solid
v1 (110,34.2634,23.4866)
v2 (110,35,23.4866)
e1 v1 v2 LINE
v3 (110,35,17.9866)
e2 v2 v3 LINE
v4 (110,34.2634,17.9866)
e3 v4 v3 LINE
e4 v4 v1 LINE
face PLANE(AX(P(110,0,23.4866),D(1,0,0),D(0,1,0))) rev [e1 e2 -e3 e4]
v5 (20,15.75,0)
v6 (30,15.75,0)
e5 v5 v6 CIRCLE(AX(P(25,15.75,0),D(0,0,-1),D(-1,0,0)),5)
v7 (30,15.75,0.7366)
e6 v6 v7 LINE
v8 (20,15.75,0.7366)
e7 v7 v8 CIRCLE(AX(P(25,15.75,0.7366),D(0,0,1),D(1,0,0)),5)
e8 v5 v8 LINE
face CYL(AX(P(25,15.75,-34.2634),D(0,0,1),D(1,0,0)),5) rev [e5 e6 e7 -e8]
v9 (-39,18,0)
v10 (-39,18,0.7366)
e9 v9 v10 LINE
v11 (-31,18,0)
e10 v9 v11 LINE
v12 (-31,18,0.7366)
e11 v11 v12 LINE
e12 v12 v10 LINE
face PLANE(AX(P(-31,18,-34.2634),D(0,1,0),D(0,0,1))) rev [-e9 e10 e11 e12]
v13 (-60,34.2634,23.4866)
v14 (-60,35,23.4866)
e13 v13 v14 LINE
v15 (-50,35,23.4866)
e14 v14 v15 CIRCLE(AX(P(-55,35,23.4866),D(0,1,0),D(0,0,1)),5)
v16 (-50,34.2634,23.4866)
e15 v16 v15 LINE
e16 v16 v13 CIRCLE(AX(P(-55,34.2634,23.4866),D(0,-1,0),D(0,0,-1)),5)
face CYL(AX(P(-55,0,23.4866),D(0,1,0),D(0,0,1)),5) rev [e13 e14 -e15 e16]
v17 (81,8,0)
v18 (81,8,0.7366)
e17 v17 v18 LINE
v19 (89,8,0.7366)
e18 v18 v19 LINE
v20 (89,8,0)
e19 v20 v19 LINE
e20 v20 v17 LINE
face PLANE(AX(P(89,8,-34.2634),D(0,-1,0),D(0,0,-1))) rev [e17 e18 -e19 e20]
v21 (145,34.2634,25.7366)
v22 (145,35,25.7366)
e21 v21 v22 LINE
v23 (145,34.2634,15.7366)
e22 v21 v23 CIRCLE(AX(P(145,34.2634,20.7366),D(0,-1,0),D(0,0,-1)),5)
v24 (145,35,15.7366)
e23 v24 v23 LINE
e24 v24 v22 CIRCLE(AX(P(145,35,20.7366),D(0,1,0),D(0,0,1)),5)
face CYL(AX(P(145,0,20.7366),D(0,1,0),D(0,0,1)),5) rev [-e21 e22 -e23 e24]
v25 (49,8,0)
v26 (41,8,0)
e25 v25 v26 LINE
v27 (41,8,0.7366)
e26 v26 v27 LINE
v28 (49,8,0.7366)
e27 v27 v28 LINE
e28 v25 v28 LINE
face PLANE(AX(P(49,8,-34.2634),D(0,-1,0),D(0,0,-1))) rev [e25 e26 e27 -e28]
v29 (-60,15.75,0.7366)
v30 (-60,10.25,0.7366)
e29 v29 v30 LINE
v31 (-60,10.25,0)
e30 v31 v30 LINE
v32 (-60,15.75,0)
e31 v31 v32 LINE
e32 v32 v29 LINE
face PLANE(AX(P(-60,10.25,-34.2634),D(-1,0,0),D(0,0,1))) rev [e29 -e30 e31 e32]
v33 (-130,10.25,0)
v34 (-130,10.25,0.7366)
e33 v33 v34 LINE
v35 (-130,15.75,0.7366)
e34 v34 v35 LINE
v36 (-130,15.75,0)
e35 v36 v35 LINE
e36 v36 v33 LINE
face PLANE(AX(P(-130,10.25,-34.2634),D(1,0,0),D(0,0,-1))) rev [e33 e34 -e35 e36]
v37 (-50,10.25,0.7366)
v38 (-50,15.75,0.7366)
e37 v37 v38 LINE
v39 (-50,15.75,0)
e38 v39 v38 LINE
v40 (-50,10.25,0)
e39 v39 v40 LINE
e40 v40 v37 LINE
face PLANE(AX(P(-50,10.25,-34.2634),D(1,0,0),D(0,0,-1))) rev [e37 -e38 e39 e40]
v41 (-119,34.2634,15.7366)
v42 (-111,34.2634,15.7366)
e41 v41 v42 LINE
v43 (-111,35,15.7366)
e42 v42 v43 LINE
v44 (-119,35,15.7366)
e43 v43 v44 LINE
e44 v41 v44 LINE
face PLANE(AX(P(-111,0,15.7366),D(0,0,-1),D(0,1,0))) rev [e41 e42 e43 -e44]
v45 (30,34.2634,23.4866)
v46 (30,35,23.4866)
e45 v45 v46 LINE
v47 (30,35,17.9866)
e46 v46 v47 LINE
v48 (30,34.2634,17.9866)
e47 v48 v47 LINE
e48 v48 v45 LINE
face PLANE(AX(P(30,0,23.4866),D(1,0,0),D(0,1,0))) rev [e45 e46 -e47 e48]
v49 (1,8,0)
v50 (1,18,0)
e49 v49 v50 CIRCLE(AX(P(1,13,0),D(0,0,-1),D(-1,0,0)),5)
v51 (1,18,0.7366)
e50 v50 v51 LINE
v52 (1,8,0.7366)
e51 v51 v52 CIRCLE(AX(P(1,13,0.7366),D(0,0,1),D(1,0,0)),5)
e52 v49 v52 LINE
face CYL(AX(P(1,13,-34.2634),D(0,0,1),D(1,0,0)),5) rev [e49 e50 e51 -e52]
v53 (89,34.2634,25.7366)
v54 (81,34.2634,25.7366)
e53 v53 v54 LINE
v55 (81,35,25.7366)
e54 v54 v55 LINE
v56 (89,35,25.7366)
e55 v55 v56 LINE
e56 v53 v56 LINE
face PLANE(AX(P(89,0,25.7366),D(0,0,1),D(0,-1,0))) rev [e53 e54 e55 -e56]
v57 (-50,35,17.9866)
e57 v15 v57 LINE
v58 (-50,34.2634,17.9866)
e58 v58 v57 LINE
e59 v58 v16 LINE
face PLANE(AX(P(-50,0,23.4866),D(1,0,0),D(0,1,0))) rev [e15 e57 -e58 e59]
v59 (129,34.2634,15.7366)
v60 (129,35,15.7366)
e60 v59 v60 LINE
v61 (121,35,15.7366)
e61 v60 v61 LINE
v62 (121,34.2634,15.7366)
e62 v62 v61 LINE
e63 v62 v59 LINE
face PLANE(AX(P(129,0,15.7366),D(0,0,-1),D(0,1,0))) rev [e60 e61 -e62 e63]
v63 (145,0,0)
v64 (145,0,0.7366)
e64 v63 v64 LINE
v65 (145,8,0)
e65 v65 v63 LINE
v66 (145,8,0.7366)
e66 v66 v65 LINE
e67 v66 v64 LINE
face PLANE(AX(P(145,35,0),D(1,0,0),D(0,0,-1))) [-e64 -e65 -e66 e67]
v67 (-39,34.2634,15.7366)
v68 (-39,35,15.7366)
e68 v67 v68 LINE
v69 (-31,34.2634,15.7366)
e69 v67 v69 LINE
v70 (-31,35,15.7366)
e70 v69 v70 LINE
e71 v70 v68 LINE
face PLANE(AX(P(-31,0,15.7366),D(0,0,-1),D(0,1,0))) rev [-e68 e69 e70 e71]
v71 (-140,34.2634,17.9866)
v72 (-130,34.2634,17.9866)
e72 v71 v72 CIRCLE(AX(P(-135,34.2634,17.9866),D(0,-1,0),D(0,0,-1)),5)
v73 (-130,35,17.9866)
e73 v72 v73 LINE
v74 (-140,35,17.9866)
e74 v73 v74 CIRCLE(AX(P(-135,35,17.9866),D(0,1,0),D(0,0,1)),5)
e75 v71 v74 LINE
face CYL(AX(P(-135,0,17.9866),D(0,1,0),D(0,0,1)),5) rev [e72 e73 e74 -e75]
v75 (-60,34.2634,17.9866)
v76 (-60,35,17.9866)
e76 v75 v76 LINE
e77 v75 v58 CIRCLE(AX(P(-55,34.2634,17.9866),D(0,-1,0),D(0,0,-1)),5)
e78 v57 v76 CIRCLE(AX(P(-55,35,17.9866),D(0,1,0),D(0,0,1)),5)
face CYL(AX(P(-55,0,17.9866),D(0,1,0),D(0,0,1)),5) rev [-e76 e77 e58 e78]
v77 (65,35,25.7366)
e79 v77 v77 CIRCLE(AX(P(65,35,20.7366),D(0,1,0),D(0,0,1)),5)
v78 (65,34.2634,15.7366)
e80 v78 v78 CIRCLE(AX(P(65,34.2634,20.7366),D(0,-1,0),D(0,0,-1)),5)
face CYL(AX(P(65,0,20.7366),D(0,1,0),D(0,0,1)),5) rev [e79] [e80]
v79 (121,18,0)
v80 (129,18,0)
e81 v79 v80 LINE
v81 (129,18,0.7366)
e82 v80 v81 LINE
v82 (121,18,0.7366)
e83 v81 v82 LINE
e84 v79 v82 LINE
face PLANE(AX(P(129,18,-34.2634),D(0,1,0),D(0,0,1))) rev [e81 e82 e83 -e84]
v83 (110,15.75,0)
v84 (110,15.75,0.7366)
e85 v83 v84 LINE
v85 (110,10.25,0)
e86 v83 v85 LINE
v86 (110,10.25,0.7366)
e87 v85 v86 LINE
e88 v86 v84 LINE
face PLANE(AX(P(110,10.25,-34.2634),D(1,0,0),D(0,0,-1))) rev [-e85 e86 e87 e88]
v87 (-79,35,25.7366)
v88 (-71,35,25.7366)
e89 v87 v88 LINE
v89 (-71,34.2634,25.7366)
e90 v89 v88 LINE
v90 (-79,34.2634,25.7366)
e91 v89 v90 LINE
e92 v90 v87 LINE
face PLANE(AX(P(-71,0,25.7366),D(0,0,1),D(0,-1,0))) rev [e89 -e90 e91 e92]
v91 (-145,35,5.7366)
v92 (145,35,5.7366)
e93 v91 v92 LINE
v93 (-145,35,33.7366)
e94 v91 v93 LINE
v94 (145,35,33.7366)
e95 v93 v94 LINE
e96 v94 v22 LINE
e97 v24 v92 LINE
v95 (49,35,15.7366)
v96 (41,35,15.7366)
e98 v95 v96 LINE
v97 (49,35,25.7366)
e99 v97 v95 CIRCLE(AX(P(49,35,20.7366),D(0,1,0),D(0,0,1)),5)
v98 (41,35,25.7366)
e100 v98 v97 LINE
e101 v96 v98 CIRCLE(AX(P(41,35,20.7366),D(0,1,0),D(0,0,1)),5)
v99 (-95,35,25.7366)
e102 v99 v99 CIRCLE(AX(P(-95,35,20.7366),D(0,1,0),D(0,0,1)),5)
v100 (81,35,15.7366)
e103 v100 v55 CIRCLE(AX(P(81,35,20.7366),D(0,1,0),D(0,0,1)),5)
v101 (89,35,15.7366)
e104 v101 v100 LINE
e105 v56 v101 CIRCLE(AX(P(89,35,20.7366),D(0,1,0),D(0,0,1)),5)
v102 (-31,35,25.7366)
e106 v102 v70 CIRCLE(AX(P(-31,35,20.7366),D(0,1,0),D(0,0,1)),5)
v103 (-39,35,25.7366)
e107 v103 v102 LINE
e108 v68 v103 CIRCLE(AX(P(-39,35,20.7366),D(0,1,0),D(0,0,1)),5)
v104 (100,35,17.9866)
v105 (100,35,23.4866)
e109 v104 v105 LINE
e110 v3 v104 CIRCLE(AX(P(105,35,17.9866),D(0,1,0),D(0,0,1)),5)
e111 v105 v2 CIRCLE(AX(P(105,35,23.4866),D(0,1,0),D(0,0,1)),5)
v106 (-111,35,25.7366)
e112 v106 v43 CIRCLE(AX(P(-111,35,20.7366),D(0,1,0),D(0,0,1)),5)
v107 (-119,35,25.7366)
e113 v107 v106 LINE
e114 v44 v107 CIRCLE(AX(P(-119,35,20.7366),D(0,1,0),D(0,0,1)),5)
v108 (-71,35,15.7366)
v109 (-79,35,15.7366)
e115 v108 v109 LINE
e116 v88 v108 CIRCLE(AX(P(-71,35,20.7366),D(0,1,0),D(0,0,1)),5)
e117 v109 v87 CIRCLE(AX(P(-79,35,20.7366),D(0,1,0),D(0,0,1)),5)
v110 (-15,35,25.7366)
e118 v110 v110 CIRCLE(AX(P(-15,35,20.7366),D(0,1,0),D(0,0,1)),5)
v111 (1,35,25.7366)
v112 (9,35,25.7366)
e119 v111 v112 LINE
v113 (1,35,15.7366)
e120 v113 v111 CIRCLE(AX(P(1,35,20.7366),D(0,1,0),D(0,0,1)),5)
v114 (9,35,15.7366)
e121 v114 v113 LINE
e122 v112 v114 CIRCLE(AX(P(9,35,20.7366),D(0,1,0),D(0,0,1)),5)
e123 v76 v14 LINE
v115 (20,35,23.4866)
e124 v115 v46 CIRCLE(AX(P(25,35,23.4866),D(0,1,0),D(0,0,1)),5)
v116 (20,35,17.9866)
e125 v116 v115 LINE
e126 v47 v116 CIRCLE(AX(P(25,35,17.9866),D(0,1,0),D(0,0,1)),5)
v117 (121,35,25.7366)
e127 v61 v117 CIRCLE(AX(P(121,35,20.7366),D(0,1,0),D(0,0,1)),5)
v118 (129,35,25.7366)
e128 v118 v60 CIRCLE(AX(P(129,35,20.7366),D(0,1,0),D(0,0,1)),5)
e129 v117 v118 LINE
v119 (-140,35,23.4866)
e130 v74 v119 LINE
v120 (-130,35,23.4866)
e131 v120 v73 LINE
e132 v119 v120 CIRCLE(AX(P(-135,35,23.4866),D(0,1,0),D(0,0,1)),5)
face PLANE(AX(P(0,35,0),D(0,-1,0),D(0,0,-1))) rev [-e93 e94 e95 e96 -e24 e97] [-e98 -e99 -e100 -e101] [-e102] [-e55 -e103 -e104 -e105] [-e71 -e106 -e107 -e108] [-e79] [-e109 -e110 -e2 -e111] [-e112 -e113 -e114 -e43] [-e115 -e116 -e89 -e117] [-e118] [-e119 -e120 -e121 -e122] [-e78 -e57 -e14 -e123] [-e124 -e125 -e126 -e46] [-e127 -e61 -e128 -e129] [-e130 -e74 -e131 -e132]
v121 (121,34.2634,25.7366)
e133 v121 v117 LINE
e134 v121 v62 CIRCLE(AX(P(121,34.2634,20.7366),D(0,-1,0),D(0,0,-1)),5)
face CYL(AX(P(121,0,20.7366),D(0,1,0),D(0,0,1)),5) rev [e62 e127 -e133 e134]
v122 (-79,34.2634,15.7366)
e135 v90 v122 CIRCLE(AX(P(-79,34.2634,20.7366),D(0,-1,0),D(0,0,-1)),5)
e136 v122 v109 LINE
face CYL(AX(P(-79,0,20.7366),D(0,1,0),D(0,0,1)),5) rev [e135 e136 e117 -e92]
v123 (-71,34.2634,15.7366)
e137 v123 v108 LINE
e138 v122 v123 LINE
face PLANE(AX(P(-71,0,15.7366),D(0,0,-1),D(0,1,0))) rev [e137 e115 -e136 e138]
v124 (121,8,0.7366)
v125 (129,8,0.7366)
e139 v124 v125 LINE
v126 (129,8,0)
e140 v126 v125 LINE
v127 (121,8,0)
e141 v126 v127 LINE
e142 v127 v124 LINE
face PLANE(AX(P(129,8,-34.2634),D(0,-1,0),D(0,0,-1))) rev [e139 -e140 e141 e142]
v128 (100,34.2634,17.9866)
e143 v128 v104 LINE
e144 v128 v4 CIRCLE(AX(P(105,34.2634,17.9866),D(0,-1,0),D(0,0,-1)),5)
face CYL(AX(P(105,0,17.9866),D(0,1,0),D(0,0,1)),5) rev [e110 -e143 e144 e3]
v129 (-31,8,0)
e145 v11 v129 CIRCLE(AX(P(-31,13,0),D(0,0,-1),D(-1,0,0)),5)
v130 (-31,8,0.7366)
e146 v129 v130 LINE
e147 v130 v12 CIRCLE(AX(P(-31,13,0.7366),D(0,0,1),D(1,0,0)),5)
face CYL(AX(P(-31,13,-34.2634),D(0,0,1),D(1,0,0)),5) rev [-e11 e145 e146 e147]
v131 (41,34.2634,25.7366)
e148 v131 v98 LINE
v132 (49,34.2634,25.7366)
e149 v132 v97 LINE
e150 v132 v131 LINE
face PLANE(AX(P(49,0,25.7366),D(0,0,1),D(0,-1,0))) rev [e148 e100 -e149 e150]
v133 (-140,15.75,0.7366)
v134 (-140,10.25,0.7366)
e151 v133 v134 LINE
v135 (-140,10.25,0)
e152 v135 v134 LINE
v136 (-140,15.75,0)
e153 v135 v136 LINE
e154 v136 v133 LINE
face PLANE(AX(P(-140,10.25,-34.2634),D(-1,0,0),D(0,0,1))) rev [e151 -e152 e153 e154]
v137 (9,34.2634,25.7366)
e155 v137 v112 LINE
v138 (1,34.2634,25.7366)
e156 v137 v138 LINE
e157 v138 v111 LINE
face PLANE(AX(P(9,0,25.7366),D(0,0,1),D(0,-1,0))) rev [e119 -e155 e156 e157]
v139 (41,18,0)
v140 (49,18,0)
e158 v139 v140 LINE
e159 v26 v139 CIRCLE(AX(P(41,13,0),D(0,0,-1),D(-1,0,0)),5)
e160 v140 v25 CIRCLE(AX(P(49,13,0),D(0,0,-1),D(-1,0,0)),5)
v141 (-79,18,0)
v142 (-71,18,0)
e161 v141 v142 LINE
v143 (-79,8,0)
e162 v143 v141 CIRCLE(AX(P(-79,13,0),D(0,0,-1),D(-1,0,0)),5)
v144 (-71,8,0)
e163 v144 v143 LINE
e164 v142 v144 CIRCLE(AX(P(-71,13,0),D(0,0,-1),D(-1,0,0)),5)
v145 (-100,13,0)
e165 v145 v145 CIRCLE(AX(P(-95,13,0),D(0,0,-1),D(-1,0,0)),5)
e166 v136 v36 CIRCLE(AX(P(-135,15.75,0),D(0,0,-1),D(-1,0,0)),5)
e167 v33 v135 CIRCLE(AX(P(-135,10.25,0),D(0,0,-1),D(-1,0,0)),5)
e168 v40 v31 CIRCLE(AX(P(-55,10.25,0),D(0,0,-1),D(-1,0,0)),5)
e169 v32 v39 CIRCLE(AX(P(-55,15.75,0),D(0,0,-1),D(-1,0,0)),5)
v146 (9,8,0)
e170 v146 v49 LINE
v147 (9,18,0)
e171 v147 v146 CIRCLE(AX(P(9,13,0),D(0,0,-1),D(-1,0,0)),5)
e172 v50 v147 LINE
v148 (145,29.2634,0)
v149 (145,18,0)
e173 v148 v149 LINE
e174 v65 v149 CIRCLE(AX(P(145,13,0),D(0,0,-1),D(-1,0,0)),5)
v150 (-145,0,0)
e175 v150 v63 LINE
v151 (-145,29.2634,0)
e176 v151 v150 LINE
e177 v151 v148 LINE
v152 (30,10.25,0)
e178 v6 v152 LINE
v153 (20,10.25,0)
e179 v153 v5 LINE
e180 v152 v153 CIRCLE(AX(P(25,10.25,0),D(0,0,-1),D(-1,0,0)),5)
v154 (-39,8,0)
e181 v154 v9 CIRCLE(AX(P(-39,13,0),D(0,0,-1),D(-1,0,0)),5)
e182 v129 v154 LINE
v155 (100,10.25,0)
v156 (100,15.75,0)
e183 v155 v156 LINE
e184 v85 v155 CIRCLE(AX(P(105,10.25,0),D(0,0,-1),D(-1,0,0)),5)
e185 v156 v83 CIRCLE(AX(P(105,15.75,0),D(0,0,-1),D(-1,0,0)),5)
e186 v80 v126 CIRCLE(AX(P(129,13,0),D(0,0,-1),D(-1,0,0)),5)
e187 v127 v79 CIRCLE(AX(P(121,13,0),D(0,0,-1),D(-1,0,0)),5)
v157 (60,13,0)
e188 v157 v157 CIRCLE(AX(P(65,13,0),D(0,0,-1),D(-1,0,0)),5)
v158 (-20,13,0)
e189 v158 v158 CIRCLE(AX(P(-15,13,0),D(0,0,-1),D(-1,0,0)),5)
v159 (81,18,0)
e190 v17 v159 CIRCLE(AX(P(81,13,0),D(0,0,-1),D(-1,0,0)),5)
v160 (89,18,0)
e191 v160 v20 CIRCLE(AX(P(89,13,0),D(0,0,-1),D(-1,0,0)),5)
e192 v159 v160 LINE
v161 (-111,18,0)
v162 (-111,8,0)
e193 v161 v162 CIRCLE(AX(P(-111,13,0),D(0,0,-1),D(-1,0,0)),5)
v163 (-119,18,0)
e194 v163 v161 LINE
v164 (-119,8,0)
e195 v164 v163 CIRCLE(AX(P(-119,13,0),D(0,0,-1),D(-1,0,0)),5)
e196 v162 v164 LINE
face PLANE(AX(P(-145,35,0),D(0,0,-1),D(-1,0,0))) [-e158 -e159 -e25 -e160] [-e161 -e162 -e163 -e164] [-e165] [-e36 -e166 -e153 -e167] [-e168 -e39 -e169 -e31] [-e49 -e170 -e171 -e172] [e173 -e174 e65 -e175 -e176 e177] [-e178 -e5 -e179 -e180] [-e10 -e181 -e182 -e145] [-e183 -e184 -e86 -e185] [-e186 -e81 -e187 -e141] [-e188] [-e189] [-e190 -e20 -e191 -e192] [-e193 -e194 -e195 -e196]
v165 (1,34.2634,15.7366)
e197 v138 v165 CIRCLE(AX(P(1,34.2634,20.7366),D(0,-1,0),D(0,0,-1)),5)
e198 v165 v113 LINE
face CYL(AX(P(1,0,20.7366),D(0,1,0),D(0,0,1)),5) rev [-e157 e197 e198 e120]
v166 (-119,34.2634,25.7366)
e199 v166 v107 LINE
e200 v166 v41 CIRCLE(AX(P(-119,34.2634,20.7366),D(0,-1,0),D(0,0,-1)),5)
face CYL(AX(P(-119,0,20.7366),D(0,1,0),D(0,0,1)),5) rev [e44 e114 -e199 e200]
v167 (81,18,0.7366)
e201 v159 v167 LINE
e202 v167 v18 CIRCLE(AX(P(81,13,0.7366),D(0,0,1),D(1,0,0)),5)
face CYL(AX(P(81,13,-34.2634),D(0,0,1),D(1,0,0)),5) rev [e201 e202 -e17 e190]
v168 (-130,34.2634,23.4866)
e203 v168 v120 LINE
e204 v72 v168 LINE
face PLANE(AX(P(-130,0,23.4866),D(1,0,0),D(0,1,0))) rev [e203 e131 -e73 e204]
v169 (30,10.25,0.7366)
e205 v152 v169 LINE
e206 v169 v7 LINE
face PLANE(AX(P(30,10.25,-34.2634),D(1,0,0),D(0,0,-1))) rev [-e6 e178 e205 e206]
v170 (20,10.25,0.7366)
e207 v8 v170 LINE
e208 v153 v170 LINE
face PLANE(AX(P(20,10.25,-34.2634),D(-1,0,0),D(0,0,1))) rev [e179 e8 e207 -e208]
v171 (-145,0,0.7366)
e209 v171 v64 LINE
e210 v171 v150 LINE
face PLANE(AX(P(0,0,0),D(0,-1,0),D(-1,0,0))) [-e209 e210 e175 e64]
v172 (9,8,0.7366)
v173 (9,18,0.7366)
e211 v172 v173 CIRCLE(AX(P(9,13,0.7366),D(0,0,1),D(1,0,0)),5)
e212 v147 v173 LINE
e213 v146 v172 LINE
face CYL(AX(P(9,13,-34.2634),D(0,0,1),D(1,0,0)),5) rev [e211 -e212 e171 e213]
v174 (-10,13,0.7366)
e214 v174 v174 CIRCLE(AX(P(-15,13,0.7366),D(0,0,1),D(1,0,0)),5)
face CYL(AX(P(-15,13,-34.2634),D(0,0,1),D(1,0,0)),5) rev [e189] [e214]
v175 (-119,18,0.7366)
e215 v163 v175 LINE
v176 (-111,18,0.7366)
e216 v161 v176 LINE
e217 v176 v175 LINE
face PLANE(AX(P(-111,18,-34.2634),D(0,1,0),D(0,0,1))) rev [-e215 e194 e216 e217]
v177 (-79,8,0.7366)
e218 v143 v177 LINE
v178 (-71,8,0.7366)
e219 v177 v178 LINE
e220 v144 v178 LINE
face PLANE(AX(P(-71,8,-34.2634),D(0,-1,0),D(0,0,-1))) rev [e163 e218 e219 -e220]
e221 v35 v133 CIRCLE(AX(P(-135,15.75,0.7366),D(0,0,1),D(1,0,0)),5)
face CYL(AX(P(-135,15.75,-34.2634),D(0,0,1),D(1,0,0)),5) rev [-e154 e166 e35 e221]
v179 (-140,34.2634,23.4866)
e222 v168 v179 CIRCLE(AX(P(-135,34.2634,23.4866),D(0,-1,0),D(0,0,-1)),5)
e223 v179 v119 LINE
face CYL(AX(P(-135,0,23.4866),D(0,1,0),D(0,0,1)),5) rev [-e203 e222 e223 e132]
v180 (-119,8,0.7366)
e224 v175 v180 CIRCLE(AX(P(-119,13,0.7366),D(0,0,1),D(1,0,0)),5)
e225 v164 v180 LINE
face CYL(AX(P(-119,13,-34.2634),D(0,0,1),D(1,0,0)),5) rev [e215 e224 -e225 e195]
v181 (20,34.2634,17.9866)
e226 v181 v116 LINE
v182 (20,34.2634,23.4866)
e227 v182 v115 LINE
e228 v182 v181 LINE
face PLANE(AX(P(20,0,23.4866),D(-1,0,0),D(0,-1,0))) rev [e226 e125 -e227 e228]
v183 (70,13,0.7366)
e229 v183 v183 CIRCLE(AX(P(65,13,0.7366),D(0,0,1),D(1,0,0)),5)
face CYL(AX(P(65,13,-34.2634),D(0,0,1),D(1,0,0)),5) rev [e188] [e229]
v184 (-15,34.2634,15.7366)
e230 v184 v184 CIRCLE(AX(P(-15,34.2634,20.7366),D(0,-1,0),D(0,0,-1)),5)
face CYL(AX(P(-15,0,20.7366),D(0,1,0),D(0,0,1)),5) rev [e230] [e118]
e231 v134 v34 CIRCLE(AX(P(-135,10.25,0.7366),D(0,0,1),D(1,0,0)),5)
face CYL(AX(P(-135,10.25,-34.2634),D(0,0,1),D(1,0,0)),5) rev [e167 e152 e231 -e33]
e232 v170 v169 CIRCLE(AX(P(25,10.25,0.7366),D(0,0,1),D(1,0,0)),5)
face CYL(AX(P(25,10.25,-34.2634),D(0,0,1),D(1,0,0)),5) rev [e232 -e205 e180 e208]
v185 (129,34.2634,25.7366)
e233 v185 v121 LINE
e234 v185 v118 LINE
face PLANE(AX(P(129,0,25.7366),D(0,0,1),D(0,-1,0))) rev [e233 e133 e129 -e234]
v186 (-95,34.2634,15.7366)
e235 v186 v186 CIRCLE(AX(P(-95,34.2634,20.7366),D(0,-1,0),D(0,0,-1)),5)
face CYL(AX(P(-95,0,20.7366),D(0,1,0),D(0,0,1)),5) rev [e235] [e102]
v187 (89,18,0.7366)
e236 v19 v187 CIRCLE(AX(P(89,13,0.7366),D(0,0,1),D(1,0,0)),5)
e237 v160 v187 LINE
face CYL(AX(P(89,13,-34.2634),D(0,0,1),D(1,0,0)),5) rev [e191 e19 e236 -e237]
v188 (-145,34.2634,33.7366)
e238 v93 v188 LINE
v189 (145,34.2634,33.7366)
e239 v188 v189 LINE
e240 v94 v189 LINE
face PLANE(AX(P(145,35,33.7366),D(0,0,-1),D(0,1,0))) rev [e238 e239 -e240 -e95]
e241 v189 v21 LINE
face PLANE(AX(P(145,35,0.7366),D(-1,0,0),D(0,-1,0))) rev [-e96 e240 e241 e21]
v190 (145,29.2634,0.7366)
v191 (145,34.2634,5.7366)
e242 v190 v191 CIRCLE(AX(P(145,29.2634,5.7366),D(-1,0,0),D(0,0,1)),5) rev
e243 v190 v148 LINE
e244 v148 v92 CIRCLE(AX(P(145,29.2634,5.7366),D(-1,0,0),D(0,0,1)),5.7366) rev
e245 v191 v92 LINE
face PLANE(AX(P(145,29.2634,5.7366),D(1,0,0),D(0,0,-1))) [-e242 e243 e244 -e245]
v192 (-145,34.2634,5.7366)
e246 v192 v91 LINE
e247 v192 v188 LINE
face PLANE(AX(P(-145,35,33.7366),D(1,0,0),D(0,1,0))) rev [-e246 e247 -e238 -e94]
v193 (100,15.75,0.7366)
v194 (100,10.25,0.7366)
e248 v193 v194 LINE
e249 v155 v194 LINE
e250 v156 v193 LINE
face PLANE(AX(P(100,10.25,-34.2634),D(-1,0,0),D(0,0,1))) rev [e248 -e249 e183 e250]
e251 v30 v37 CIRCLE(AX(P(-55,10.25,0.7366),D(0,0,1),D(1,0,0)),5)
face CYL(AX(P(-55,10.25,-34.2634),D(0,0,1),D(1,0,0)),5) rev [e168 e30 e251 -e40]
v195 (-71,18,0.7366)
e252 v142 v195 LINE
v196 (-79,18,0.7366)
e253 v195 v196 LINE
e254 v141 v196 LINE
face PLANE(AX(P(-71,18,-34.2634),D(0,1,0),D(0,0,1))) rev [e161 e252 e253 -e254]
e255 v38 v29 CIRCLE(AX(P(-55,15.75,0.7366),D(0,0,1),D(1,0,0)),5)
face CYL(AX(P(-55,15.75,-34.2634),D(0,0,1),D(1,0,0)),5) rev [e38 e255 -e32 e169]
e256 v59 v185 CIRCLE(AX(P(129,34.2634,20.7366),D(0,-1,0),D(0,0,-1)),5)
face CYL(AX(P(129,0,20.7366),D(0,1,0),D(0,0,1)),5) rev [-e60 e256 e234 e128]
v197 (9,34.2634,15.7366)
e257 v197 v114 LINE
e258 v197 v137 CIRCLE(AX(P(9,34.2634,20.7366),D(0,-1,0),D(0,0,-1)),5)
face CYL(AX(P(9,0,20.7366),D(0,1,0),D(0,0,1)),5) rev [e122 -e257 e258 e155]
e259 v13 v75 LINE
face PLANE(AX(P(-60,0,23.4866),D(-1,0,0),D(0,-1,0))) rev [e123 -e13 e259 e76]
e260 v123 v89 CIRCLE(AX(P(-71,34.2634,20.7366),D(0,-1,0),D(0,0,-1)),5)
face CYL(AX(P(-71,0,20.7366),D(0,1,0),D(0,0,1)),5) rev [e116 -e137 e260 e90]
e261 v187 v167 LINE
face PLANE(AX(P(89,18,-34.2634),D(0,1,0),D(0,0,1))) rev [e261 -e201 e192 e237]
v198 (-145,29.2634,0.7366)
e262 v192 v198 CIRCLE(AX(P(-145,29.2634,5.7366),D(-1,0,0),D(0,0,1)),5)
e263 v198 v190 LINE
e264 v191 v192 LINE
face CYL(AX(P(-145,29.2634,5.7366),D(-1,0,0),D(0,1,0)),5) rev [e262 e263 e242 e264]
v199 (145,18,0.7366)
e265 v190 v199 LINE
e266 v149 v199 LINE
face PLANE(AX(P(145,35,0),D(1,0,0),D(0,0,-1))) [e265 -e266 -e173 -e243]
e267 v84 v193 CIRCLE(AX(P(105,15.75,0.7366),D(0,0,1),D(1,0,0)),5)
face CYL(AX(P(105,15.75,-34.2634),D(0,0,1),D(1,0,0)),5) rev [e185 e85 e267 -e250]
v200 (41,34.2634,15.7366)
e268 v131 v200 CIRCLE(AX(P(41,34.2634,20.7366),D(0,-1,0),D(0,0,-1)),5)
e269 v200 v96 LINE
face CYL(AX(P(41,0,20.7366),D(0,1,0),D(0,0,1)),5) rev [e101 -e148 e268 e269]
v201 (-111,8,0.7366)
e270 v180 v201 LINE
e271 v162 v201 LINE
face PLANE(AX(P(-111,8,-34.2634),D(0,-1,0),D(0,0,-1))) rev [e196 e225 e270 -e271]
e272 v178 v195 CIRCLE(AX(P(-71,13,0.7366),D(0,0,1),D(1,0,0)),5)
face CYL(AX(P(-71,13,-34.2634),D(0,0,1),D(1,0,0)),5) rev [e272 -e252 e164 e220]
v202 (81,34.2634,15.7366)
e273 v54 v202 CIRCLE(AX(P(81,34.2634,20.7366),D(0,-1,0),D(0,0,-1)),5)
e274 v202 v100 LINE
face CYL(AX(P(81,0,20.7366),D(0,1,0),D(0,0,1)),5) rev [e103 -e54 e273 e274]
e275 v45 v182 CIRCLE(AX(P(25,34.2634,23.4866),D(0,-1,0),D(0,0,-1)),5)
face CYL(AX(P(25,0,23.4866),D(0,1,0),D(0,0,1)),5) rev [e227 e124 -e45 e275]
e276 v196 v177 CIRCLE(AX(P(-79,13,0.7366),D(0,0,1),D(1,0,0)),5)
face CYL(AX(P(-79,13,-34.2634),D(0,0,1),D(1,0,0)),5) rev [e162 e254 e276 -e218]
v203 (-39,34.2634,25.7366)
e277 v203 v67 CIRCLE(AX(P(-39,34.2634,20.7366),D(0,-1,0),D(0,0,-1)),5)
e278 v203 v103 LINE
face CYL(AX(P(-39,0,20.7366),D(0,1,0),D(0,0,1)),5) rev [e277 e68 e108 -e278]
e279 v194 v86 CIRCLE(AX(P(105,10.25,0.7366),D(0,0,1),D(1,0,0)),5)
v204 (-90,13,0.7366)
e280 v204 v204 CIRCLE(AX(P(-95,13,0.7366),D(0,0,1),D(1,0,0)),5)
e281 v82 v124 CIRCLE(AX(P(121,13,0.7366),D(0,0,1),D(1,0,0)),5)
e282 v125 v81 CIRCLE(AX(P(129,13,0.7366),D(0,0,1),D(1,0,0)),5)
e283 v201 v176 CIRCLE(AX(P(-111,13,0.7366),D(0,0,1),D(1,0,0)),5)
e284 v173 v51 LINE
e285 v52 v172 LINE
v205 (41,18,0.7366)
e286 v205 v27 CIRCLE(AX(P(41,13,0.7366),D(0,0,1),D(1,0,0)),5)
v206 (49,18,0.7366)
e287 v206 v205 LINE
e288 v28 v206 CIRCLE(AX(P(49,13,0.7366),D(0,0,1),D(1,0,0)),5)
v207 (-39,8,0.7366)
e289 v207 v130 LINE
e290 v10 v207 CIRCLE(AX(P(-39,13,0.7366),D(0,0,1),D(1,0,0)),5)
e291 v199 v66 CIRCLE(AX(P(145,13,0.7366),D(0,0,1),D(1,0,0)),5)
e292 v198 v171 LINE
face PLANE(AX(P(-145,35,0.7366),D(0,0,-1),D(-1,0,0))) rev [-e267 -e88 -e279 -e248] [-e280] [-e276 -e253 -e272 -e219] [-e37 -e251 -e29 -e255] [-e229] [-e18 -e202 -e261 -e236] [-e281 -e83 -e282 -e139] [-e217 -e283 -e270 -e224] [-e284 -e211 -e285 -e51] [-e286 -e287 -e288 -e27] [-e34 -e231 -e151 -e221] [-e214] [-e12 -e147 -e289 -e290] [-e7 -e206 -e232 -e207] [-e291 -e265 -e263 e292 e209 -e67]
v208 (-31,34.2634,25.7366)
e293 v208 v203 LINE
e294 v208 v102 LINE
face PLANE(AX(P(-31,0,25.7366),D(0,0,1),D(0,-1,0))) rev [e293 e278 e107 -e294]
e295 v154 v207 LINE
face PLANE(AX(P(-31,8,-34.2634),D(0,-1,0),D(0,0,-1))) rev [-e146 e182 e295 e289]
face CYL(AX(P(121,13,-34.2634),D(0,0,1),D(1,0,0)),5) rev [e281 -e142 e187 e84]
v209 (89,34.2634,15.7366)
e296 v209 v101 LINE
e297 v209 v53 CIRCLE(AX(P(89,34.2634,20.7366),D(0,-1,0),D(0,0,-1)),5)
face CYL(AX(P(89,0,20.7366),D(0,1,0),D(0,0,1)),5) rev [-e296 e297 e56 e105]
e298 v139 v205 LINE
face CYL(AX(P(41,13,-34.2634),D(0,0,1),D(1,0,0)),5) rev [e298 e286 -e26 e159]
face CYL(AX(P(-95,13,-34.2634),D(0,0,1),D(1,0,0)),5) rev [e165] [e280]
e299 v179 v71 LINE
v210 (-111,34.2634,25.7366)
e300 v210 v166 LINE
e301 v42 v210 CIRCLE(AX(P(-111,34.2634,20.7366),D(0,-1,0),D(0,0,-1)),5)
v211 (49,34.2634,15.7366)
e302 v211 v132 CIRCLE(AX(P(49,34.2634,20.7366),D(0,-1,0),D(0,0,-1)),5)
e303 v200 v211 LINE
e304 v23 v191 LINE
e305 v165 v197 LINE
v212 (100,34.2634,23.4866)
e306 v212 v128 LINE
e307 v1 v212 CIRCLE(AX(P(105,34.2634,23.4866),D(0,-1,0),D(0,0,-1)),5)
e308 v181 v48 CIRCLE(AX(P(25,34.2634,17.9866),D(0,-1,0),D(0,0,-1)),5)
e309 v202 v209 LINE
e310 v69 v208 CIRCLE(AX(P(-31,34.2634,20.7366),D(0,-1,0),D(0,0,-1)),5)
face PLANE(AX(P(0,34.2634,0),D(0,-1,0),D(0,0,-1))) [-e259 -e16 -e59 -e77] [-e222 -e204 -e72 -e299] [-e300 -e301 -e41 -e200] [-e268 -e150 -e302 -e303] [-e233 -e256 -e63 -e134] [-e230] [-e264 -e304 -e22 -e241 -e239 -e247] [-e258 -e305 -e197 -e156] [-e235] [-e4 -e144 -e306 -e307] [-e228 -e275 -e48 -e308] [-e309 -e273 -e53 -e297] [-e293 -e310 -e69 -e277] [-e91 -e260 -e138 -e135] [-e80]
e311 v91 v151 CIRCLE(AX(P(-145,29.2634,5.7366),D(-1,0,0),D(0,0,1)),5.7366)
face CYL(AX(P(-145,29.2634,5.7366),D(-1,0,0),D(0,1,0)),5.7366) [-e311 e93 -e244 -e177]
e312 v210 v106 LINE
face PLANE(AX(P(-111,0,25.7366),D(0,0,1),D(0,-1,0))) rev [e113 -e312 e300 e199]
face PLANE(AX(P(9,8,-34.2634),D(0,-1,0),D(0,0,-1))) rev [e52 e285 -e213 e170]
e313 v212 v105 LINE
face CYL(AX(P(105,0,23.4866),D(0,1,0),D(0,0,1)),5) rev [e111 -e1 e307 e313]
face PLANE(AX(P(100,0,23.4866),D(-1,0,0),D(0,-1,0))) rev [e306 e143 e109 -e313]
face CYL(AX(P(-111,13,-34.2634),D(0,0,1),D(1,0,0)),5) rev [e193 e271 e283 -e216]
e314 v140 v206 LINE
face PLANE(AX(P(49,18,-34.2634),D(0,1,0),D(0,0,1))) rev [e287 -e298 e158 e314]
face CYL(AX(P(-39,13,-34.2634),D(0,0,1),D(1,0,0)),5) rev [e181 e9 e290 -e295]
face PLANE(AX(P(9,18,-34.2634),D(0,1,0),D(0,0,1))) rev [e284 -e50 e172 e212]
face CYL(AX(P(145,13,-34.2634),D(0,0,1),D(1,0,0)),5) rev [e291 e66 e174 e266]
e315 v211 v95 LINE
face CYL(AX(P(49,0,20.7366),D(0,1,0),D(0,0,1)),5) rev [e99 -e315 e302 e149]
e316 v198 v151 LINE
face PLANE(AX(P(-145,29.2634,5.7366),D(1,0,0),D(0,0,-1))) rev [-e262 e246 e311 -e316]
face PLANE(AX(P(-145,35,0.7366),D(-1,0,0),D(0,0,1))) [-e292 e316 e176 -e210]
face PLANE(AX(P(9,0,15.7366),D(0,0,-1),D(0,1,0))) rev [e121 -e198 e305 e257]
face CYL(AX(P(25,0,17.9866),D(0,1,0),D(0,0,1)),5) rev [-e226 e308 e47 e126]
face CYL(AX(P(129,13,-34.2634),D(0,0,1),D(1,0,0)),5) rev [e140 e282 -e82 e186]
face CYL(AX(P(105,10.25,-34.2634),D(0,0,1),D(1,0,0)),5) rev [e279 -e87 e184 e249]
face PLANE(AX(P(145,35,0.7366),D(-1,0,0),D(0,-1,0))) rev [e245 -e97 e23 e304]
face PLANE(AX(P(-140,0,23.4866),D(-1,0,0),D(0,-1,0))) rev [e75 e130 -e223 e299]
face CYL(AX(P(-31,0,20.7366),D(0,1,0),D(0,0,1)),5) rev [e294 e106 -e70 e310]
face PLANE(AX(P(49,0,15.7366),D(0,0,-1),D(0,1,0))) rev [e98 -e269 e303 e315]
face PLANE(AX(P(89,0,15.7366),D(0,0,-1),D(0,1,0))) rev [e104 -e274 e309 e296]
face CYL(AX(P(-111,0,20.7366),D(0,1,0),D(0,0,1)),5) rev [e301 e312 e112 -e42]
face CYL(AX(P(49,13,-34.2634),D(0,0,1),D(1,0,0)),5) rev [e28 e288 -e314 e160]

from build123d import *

# Parameters (mm, degrees)
SKETCH1_W                    = 290
SKETCH1_H                    = 0.7366
BASE_FLANGE1_DEPTH           = 35
EDGE_FLANGE1_STRIP_W         = 12.9464
EDGE_FLANGE1_STRIP_H         = 0.7366
EDGE_FLANGE1_STRIP_CUT_DEPTH = 290
EDGE_FLANGE1_DEPTH           = 290
SKETCH11_R                   = 5
CUT_EXTRUDE1_DEPTH           = 153.931874309
LPATTERN1_COUNT              = 14
LPATTERN1_PITCH              = 80
SKETCH12_R                   = 5
CUT_EXTRUDE2_DEPTH           = 35
LPATTERN2_COUNT              = 15
LPATTERN2_PITCH              = 80


# Sheet-metal steps are written as plain solids
with BuildPart() as part:
    # Sketch1 → Base-Flange1 (new body)
    with BuildSketch(Plane(origin=(0, 0, 0), x_dir=(1, 0, 0), z_dir=(0, 1, 0))):
        with Locations((0, -0.3683)):
            Rectangle(SKETCH1_W, SKETCH1_H)
    extrude(amount=BASE_FLANGE1_DEPTH)

    # Edge-Flange1 strip (across the edge) → Edge-Flange1 strip cut (cut)
    with BuildSketch(Plane(origin=(145, 35, 0.7366), x_dir=(0, -1, 0), z_dir=(-1, 0, 0))):
        with Locations((-0.7366, -0.3683)):
            Rectangle(EDGE_FLANGE1_STRIP_W, EDGE_FLANGE1_STRIP_H)
    extrude(amount=EDGE_FLANGE1_STRIP_CUT_DEPTH, mode=Mode.SUBTRACT)

    # Edge-Flange1 section (across the edge) → Edge-Flange1 (add)
    with BuildSketch(Plane(origin=(145, 35, 0.7366), x_dir=(0, -1, 0), z_dir=(-1, 0, 0))):
        with BuildLine():
            Line((0, 5), (0, 33))
            Line((0, 33), (0.7366, 33))
            Line((0.7366, 33), (0.7366, 5))
            ThreePointArc((0.7366, 5), (2.201066094, 1.464466094), (5.7366, 0))
            Line((5.7366, 0), (5.7366, -0.7366))
            ThreePointArc((5.7366, -0.7366), (1.680211239, 0.943611239), (0, 5))
        make_face()
    extrude(amount=EDGE_FLANGE1_DEPTH)

    # Sketch11 → Cut-Extrude1 (cut, through all)
    with BuildSketch(Plane(origin=(0, 35, 0), x_dir=(1, 0, 0), z_dir=(0, 1, 0))):
        with Locations((145, -20.7366)):
            Circle(SKETCH11_R)
        with BuildLine():
            Line((129, -25.7366), (121, -25.7366))
            ThreePointArc((121, -25.7366), (116, -20.7366), (121, -15.7366))
            Line((121, -15.7366), (129, -15.7366))
            ThreePointArc((129, -15.7366), (134, -20.7366), (129, -25.7366))
        make_face()
        with BuildLine():
            Line((89, -25.7366), (81, -25.7366))
            ThreePointArc((81, -25.7366), (76, -20.7366), (81, -15.7366))
            Line((81, -15.7366), (89, -15.7366))
            ThreePointArc((89, -15.7366), (94, -20.7366), (89, -25.7366))
        make_face()
        with BuildLine():
            Line((100, -23.4866), (100, -17.9866))
            ThreePointArc((100, -17.9866), (105, -12.9866), (110, -17.9866))
            Line((110, -17.9866), (110, -23.4866))
            ThreePointArc((110, -23.4866), (105, -28.4866), (100, -23.4866))
        make_face()
    cut_extrude1 = extrude(amount=-CUT_EXTRUDE1_DEPTH, mode=Mode.SUBTRACT)

    # LPattern1: Cut-Extrude1 ×14
    with Locations(*[(-i * LPATTERN1_PITCH, 0, 0) for i in range(1, LPATTERN1_COUNT)]):
        add(cut_extrude1, mode=Mode.SUBTRACT)

    # Sketch12 → Cut-Extrude2 (cut)
    with BuildSketch(Plane.XY.offset(0.7366)):
        with Locations((145, 13)):
            Circle(SKETCH12_R)
        with BuildLine():
            Line((129, 8), (121, 8))
            ThreePointArc((121, 8), (116, 13), (121, 18))
            Line((121, 18), (129, 18))
            ThreePointArc((129, 18), (134, 13), (129, 8))
        make_face()
        with BuildLine():
            Line((100, 10.25), (100, 15.75))
            ThreePointArc((100, 15.75), (105, 20.75), (110, 15.75))
            Line((110, 15.75), (110, 10.25))
            ThreePointArc((110, 10.25), (105, 5.25), (100, 10.25))
        make_face()
        with BuildLine():
            Line((89, 8), (81, 8))
            ThreePointArc((81, 8), (76, 13), (81, 18))
            Line((81, 18), (89, 18))
            ThreePointArc((89, 18), (94, 13), (89, 8))
        make_face()
    cut_extrude2 = extrude(amount=-CUT_EXTRUDE2_DEPTH, mode=Mode.SUBTRACT)

    # LPattern2: Cut-Extrude2 ×15
    with Locations(*[(-i * LPATTERN2_PITCH, 0, 0) for i in range(1, LPATTERN2_COUNT)]):
        add(cut_extrude2, mode=Mode.SUBTRACT)


solid = part.part
